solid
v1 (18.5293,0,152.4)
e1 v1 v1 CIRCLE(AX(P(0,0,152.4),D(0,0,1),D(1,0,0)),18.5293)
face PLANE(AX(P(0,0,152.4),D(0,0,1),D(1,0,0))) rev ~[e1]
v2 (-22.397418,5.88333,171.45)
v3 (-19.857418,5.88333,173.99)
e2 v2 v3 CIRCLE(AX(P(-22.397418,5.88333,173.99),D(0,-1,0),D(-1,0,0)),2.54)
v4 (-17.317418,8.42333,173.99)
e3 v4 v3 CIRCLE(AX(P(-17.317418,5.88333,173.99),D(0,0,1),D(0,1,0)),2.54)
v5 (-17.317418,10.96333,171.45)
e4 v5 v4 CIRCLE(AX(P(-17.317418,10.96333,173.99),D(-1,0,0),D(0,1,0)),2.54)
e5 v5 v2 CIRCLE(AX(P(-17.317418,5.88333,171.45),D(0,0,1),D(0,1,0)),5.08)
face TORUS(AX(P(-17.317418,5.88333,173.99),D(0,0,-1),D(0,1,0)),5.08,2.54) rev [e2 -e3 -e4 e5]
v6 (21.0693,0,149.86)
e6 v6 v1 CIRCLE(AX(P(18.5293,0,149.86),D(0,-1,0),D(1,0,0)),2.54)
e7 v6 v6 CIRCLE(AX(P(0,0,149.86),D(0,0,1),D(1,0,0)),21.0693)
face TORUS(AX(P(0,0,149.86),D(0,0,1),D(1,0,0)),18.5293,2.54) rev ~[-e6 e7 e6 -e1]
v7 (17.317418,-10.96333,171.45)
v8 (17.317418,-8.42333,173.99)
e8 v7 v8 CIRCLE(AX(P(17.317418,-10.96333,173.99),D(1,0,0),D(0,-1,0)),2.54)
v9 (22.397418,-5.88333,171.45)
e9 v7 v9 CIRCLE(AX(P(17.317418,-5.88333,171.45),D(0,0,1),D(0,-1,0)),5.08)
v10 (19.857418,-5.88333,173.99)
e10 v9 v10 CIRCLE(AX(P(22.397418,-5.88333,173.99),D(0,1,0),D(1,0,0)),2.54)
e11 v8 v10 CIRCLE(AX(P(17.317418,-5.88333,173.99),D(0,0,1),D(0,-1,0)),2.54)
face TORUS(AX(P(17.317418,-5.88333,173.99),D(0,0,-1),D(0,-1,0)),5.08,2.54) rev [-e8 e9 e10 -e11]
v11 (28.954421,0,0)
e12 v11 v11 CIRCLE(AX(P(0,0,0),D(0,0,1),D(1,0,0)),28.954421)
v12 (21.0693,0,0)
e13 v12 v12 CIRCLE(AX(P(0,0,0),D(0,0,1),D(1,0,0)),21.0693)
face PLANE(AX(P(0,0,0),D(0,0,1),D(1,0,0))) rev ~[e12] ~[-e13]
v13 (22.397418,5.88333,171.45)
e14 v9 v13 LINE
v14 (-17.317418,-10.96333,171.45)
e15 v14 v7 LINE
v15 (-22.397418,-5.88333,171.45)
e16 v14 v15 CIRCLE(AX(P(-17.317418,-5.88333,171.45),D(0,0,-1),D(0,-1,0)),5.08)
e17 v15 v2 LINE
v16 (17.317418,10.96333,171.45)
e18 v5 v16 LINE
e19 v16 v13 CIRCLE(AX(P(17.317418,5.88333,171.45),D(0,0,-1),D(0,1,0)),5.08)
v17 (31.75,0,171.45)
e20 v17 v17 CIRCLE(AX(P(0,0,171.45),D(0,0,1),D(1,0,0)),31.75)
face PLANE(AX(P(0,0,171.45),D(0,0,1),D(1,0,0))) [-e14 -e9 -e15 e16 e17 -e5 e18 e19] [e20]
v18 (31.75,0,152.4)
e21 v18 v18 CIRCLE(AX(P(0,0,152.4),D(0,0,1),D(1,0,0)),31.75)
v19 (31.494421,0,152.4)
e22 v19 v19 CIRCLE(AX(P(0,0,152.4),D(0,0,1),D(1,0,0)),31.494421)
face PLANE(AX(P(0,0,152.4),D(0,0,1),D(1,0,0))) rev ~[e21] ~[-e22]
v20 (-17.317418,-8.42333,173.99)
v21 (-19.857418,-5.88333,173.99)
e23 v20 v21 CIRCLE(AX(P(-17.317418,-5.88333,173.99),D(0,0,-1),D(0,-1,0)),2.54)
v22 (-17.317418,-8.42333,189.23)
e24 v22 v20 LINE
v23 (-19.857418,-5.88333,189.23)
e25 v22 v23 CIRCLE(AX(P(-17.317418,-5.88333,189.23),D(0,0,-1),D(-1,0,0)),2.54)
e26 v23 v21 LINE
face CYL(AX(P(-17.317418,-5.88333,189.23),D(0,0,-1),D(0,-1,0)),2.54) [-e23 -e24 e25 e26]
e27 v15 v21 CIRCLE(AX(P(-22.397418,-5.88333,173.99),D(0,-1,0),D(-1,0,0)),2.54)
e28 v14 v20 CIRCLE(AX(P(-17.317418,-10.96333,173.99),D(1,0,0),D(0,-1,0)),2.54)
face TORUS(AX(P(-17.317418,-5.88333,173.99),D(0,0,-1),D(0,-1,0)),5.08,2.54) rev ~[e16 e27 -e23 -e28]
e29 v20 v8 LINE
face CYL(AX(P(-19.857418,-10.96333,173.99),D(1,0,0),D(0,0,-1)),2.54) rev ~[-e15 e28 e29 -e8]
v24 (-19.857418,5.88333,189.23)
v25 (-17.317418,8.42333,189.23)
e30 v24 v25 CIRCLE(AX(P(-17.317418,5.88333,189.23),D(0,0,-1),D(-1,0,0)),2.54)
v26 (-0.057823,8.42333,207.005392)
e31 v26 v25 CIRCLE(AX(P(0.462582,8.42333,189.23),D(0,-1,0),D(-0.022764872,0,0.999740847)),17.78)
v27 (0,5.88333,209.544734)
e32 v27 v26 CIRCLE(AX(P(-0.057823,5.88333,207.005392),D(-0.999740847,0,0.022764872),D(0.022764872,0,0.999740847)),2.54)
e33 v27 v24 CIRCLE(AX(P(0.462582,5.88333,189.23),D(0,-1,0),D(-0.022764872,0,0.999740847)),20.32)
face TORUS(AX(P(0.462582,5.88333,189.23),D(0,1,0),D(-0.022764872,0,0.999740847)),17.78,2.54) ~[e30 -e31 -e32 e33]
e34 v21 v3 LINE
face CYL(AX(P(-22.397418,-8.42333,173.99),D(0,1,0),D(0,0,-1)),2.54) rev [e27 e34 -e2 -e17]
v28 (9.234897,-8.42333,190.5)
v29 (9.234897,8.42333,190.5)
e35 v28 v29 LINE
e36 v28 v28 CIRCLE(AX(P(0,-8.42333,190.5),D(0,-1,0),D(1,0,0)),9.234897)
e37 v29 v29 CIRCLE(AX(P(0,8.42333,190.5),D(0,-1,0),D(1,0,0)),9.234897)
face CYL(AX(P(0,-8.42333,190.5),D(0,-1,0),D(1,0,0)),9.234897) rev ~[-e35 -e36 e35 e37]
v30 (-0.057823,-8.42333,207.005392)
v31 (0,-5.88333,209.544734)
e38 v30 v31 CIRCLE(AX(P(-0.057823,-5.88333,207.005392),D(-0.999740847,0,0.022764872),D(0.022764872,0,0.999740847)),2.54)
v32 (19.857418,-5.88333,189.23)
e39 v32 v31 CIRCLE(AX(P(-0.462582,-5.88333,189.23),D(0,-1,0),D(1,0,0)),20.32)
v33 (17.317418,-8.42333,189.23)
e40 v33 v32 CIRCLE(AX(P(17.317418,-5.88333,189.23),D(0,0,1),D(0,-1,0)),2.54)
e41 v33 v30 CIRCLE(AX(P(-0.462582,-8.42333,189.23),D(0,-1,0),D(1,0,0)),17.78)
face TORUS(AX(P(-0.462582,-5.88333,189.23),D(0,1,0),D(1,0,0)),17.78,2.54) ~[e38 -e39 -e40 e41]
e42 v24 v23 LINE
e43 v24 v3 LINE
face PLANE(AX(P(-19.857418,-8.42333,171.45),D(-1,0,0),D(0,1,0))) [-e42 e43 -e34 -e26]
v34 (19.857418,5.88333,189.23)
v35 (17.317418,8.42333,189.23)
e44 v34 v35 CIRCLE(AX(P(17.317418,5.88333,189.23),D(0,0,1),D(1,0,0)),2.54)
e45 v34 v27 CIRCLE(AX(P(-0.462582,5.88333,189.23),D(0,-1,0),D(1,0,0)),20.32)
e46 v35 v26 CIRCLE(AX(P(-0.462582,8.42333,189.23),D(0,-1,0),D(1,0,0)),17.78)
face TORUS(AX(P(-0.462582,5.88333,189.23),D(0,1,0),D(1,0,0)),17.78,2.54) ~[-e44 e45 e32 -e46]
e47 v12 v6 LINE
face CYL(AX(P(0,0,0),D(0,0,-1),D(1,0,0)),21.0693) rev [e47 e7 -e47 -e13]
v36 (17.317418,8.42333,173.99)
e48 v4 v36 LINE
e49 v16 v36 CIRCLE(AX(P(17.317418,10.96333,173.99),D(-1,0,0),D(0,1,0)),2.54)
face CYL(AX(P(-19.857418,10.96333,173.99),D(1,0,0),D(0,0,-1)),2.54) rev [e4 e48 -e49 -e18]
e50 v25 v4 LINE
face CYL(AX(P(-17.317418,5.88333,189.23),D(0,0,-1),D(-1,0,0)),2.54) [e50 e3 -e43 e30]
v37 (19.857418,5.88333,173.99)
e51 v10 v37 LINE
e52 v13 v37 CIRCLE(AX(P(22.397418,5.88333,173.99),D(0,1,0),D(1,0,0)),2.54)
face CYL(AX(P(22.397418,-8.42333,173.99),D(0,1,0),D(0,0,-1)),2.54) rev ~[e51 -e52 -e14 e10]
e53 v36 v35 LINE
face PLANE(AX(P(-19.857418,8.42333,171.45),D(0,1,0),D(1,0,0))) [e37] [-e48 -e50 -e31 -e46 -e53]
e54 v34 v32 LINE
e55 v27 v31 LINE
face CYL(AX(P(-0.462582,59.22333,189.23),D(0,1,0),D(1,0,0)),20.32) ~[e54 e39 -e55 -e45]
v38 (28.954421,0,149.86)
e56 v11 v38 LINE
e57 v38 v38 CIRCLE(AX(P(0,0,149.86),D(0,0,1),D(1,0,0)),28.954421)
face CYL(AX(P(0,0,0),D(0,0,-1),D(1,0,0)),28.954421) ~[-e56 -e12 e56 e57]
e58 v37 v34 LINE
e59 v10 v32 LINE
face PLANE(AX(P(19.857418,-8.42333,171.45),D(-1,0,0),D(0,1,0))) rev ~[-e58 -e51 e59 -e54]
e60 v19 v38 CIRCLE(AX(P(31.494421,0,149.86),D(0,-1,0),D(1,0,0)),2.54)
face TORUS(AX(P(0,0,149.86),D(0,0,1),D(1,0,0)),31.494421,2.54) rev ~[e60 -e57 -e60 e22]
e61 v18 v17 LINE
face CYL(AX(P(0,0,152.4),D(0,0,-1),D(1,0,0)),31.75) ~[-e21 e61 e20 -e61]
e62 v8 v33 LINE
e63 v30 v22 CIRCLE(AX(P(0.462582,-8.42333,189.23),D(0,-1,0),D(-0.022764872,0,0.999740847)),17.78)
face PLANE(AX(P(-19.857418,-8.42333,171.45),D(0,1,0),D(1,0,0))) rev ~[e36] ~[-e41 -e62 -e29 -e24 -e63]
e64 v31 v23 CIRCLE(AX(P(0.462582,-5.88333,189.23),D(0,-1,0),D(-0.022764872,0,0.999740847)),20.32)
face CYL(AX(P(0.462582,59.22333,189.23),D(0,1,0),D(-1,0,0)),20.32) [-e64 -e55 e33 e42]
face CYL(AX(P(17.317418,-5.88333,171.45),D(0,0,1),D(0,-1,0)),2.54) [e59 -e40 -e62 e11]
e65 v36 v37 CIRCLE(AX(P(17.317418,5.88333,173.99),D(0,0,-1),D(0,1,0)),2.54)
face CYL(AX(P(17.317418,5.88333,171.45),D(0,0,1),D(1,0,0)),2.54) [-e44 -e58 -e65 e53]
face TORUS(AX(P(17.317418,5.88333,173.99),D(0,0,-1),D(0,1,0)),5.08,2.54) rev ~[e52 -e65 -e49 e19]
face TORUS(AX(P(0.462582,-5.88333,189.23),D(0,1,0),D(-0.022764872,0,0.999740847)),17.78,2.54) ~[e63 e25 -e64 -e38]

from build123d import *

# Parameters (mm, degrees)
F0_R        = 28.9544209137
F0_R_2      = 21.0693
F1_DEPTH    = 152.4
F2_R        = 31.75
F3_DEPTH    = 19.05
F4_W        = 39.7148355842
F4_H        = 16.8466605246
F5_DEPTH    = 38.1
F6_R        = 9.2348971927
F7_DEPTH    = 25.4
F8_T1_DEPTH = 118.4466605246
F9_R        = 2.54


# Not quite as in the source:
# - a fillet or chamfer that OpenCascade refuses, or shapes differently, is made with other operations: its cross-section is extruded or revolved along the edge and cut away or added


with BuildPart() as f1:
    # F0 (on Top) → F1 (new body)
    with BuildSketch(Plane.XY):
        Circle(F0_R)
        Circle(F0_R_2, mode=Mode.SUBTRACT)
    extrude(amount=F1_DEPTH)

    # F2 (on face) → F3 (join)
    with BuildSketch(Plane.XY.offset(152.4)):
        Circle(F2_R)
    extrude(amount=F3_DEPTH)

    # F4 (on face) → F5 (join)
    with BuildSketch(Plane.XY.offset(171.45)):
        Rectangle(F4_W, F4_H)
    extrude(amount=F5_DEPTH)

    # F6 (on face) → F7 (cut)
    with BuildSketch(Plane.XZ.offset(8.4233302623)):
        with Locations((0, 190.5)):
            Circle(F6_R)
    extrude(amount=-F7_DEPTH, mode=Mode.SUBTRACT)

    # F8: fillet of radius 20.32 on 2 edges, made by hand

    # F8_s2 → F8_t1 (cut)
    with BuildSketch(Plane.XZ.offset(-59.2233302623)):
        with BuildLine():
            ThreePointArc((19.8574177921, 189.23), (13.9058275858, 203.5984097937), (-0.4625822079, 209.55))
            Line((-0.4625822079, 209.55), (19.8574177921, 209.55))
            Line((19.8574177921, 209.55), (19.8574177921, 189.23))
        make_face()
        with BuildLine():
            ThreePointArc((-19.8574177921, 189.23), (-13.9058275858, 203.5984097937), (0.4625822079, 209.55))
            Line((0.4625822079, 209.55), (-19.8574177921, 209.55))
            Line((-19.8574177921, 209.55), (-19.8574177921, 189.23))
        make_face()
    extrude(amount=F8_T1_DEPTH, mode=Mode.SUBTRACT)

    # F9
    f9_edges = [f1.edges().sort_by_distance(p)[0] for p in [
        (19.857418, -8.42333, 180.34),
        (14.068455, -8.42333, 203.433921),
        (-14.068455, -8.42333, 203.433921),
        (-19.857418, -8.42333, 180.34),
        (0, -8.42333, 171.45),
        (19.857418, 0, 171.45),
        (-28.954421, 0, 152.4),
        (-21.0693, 0, 152.4),
        (19.857418, 8.42333, 180.34),
        (14.068455, 8.42333, 203.433921),
        (-14.068455, 8.42333, 203.433921),
        (0, 8.42333, 171.45),
        (-19.857418, 0, 171.45),
        (-19.857418, 8.42333, 180.34),
    ]]
    fillet(f9_edges, radius=F9_R)


solid = f1.part
